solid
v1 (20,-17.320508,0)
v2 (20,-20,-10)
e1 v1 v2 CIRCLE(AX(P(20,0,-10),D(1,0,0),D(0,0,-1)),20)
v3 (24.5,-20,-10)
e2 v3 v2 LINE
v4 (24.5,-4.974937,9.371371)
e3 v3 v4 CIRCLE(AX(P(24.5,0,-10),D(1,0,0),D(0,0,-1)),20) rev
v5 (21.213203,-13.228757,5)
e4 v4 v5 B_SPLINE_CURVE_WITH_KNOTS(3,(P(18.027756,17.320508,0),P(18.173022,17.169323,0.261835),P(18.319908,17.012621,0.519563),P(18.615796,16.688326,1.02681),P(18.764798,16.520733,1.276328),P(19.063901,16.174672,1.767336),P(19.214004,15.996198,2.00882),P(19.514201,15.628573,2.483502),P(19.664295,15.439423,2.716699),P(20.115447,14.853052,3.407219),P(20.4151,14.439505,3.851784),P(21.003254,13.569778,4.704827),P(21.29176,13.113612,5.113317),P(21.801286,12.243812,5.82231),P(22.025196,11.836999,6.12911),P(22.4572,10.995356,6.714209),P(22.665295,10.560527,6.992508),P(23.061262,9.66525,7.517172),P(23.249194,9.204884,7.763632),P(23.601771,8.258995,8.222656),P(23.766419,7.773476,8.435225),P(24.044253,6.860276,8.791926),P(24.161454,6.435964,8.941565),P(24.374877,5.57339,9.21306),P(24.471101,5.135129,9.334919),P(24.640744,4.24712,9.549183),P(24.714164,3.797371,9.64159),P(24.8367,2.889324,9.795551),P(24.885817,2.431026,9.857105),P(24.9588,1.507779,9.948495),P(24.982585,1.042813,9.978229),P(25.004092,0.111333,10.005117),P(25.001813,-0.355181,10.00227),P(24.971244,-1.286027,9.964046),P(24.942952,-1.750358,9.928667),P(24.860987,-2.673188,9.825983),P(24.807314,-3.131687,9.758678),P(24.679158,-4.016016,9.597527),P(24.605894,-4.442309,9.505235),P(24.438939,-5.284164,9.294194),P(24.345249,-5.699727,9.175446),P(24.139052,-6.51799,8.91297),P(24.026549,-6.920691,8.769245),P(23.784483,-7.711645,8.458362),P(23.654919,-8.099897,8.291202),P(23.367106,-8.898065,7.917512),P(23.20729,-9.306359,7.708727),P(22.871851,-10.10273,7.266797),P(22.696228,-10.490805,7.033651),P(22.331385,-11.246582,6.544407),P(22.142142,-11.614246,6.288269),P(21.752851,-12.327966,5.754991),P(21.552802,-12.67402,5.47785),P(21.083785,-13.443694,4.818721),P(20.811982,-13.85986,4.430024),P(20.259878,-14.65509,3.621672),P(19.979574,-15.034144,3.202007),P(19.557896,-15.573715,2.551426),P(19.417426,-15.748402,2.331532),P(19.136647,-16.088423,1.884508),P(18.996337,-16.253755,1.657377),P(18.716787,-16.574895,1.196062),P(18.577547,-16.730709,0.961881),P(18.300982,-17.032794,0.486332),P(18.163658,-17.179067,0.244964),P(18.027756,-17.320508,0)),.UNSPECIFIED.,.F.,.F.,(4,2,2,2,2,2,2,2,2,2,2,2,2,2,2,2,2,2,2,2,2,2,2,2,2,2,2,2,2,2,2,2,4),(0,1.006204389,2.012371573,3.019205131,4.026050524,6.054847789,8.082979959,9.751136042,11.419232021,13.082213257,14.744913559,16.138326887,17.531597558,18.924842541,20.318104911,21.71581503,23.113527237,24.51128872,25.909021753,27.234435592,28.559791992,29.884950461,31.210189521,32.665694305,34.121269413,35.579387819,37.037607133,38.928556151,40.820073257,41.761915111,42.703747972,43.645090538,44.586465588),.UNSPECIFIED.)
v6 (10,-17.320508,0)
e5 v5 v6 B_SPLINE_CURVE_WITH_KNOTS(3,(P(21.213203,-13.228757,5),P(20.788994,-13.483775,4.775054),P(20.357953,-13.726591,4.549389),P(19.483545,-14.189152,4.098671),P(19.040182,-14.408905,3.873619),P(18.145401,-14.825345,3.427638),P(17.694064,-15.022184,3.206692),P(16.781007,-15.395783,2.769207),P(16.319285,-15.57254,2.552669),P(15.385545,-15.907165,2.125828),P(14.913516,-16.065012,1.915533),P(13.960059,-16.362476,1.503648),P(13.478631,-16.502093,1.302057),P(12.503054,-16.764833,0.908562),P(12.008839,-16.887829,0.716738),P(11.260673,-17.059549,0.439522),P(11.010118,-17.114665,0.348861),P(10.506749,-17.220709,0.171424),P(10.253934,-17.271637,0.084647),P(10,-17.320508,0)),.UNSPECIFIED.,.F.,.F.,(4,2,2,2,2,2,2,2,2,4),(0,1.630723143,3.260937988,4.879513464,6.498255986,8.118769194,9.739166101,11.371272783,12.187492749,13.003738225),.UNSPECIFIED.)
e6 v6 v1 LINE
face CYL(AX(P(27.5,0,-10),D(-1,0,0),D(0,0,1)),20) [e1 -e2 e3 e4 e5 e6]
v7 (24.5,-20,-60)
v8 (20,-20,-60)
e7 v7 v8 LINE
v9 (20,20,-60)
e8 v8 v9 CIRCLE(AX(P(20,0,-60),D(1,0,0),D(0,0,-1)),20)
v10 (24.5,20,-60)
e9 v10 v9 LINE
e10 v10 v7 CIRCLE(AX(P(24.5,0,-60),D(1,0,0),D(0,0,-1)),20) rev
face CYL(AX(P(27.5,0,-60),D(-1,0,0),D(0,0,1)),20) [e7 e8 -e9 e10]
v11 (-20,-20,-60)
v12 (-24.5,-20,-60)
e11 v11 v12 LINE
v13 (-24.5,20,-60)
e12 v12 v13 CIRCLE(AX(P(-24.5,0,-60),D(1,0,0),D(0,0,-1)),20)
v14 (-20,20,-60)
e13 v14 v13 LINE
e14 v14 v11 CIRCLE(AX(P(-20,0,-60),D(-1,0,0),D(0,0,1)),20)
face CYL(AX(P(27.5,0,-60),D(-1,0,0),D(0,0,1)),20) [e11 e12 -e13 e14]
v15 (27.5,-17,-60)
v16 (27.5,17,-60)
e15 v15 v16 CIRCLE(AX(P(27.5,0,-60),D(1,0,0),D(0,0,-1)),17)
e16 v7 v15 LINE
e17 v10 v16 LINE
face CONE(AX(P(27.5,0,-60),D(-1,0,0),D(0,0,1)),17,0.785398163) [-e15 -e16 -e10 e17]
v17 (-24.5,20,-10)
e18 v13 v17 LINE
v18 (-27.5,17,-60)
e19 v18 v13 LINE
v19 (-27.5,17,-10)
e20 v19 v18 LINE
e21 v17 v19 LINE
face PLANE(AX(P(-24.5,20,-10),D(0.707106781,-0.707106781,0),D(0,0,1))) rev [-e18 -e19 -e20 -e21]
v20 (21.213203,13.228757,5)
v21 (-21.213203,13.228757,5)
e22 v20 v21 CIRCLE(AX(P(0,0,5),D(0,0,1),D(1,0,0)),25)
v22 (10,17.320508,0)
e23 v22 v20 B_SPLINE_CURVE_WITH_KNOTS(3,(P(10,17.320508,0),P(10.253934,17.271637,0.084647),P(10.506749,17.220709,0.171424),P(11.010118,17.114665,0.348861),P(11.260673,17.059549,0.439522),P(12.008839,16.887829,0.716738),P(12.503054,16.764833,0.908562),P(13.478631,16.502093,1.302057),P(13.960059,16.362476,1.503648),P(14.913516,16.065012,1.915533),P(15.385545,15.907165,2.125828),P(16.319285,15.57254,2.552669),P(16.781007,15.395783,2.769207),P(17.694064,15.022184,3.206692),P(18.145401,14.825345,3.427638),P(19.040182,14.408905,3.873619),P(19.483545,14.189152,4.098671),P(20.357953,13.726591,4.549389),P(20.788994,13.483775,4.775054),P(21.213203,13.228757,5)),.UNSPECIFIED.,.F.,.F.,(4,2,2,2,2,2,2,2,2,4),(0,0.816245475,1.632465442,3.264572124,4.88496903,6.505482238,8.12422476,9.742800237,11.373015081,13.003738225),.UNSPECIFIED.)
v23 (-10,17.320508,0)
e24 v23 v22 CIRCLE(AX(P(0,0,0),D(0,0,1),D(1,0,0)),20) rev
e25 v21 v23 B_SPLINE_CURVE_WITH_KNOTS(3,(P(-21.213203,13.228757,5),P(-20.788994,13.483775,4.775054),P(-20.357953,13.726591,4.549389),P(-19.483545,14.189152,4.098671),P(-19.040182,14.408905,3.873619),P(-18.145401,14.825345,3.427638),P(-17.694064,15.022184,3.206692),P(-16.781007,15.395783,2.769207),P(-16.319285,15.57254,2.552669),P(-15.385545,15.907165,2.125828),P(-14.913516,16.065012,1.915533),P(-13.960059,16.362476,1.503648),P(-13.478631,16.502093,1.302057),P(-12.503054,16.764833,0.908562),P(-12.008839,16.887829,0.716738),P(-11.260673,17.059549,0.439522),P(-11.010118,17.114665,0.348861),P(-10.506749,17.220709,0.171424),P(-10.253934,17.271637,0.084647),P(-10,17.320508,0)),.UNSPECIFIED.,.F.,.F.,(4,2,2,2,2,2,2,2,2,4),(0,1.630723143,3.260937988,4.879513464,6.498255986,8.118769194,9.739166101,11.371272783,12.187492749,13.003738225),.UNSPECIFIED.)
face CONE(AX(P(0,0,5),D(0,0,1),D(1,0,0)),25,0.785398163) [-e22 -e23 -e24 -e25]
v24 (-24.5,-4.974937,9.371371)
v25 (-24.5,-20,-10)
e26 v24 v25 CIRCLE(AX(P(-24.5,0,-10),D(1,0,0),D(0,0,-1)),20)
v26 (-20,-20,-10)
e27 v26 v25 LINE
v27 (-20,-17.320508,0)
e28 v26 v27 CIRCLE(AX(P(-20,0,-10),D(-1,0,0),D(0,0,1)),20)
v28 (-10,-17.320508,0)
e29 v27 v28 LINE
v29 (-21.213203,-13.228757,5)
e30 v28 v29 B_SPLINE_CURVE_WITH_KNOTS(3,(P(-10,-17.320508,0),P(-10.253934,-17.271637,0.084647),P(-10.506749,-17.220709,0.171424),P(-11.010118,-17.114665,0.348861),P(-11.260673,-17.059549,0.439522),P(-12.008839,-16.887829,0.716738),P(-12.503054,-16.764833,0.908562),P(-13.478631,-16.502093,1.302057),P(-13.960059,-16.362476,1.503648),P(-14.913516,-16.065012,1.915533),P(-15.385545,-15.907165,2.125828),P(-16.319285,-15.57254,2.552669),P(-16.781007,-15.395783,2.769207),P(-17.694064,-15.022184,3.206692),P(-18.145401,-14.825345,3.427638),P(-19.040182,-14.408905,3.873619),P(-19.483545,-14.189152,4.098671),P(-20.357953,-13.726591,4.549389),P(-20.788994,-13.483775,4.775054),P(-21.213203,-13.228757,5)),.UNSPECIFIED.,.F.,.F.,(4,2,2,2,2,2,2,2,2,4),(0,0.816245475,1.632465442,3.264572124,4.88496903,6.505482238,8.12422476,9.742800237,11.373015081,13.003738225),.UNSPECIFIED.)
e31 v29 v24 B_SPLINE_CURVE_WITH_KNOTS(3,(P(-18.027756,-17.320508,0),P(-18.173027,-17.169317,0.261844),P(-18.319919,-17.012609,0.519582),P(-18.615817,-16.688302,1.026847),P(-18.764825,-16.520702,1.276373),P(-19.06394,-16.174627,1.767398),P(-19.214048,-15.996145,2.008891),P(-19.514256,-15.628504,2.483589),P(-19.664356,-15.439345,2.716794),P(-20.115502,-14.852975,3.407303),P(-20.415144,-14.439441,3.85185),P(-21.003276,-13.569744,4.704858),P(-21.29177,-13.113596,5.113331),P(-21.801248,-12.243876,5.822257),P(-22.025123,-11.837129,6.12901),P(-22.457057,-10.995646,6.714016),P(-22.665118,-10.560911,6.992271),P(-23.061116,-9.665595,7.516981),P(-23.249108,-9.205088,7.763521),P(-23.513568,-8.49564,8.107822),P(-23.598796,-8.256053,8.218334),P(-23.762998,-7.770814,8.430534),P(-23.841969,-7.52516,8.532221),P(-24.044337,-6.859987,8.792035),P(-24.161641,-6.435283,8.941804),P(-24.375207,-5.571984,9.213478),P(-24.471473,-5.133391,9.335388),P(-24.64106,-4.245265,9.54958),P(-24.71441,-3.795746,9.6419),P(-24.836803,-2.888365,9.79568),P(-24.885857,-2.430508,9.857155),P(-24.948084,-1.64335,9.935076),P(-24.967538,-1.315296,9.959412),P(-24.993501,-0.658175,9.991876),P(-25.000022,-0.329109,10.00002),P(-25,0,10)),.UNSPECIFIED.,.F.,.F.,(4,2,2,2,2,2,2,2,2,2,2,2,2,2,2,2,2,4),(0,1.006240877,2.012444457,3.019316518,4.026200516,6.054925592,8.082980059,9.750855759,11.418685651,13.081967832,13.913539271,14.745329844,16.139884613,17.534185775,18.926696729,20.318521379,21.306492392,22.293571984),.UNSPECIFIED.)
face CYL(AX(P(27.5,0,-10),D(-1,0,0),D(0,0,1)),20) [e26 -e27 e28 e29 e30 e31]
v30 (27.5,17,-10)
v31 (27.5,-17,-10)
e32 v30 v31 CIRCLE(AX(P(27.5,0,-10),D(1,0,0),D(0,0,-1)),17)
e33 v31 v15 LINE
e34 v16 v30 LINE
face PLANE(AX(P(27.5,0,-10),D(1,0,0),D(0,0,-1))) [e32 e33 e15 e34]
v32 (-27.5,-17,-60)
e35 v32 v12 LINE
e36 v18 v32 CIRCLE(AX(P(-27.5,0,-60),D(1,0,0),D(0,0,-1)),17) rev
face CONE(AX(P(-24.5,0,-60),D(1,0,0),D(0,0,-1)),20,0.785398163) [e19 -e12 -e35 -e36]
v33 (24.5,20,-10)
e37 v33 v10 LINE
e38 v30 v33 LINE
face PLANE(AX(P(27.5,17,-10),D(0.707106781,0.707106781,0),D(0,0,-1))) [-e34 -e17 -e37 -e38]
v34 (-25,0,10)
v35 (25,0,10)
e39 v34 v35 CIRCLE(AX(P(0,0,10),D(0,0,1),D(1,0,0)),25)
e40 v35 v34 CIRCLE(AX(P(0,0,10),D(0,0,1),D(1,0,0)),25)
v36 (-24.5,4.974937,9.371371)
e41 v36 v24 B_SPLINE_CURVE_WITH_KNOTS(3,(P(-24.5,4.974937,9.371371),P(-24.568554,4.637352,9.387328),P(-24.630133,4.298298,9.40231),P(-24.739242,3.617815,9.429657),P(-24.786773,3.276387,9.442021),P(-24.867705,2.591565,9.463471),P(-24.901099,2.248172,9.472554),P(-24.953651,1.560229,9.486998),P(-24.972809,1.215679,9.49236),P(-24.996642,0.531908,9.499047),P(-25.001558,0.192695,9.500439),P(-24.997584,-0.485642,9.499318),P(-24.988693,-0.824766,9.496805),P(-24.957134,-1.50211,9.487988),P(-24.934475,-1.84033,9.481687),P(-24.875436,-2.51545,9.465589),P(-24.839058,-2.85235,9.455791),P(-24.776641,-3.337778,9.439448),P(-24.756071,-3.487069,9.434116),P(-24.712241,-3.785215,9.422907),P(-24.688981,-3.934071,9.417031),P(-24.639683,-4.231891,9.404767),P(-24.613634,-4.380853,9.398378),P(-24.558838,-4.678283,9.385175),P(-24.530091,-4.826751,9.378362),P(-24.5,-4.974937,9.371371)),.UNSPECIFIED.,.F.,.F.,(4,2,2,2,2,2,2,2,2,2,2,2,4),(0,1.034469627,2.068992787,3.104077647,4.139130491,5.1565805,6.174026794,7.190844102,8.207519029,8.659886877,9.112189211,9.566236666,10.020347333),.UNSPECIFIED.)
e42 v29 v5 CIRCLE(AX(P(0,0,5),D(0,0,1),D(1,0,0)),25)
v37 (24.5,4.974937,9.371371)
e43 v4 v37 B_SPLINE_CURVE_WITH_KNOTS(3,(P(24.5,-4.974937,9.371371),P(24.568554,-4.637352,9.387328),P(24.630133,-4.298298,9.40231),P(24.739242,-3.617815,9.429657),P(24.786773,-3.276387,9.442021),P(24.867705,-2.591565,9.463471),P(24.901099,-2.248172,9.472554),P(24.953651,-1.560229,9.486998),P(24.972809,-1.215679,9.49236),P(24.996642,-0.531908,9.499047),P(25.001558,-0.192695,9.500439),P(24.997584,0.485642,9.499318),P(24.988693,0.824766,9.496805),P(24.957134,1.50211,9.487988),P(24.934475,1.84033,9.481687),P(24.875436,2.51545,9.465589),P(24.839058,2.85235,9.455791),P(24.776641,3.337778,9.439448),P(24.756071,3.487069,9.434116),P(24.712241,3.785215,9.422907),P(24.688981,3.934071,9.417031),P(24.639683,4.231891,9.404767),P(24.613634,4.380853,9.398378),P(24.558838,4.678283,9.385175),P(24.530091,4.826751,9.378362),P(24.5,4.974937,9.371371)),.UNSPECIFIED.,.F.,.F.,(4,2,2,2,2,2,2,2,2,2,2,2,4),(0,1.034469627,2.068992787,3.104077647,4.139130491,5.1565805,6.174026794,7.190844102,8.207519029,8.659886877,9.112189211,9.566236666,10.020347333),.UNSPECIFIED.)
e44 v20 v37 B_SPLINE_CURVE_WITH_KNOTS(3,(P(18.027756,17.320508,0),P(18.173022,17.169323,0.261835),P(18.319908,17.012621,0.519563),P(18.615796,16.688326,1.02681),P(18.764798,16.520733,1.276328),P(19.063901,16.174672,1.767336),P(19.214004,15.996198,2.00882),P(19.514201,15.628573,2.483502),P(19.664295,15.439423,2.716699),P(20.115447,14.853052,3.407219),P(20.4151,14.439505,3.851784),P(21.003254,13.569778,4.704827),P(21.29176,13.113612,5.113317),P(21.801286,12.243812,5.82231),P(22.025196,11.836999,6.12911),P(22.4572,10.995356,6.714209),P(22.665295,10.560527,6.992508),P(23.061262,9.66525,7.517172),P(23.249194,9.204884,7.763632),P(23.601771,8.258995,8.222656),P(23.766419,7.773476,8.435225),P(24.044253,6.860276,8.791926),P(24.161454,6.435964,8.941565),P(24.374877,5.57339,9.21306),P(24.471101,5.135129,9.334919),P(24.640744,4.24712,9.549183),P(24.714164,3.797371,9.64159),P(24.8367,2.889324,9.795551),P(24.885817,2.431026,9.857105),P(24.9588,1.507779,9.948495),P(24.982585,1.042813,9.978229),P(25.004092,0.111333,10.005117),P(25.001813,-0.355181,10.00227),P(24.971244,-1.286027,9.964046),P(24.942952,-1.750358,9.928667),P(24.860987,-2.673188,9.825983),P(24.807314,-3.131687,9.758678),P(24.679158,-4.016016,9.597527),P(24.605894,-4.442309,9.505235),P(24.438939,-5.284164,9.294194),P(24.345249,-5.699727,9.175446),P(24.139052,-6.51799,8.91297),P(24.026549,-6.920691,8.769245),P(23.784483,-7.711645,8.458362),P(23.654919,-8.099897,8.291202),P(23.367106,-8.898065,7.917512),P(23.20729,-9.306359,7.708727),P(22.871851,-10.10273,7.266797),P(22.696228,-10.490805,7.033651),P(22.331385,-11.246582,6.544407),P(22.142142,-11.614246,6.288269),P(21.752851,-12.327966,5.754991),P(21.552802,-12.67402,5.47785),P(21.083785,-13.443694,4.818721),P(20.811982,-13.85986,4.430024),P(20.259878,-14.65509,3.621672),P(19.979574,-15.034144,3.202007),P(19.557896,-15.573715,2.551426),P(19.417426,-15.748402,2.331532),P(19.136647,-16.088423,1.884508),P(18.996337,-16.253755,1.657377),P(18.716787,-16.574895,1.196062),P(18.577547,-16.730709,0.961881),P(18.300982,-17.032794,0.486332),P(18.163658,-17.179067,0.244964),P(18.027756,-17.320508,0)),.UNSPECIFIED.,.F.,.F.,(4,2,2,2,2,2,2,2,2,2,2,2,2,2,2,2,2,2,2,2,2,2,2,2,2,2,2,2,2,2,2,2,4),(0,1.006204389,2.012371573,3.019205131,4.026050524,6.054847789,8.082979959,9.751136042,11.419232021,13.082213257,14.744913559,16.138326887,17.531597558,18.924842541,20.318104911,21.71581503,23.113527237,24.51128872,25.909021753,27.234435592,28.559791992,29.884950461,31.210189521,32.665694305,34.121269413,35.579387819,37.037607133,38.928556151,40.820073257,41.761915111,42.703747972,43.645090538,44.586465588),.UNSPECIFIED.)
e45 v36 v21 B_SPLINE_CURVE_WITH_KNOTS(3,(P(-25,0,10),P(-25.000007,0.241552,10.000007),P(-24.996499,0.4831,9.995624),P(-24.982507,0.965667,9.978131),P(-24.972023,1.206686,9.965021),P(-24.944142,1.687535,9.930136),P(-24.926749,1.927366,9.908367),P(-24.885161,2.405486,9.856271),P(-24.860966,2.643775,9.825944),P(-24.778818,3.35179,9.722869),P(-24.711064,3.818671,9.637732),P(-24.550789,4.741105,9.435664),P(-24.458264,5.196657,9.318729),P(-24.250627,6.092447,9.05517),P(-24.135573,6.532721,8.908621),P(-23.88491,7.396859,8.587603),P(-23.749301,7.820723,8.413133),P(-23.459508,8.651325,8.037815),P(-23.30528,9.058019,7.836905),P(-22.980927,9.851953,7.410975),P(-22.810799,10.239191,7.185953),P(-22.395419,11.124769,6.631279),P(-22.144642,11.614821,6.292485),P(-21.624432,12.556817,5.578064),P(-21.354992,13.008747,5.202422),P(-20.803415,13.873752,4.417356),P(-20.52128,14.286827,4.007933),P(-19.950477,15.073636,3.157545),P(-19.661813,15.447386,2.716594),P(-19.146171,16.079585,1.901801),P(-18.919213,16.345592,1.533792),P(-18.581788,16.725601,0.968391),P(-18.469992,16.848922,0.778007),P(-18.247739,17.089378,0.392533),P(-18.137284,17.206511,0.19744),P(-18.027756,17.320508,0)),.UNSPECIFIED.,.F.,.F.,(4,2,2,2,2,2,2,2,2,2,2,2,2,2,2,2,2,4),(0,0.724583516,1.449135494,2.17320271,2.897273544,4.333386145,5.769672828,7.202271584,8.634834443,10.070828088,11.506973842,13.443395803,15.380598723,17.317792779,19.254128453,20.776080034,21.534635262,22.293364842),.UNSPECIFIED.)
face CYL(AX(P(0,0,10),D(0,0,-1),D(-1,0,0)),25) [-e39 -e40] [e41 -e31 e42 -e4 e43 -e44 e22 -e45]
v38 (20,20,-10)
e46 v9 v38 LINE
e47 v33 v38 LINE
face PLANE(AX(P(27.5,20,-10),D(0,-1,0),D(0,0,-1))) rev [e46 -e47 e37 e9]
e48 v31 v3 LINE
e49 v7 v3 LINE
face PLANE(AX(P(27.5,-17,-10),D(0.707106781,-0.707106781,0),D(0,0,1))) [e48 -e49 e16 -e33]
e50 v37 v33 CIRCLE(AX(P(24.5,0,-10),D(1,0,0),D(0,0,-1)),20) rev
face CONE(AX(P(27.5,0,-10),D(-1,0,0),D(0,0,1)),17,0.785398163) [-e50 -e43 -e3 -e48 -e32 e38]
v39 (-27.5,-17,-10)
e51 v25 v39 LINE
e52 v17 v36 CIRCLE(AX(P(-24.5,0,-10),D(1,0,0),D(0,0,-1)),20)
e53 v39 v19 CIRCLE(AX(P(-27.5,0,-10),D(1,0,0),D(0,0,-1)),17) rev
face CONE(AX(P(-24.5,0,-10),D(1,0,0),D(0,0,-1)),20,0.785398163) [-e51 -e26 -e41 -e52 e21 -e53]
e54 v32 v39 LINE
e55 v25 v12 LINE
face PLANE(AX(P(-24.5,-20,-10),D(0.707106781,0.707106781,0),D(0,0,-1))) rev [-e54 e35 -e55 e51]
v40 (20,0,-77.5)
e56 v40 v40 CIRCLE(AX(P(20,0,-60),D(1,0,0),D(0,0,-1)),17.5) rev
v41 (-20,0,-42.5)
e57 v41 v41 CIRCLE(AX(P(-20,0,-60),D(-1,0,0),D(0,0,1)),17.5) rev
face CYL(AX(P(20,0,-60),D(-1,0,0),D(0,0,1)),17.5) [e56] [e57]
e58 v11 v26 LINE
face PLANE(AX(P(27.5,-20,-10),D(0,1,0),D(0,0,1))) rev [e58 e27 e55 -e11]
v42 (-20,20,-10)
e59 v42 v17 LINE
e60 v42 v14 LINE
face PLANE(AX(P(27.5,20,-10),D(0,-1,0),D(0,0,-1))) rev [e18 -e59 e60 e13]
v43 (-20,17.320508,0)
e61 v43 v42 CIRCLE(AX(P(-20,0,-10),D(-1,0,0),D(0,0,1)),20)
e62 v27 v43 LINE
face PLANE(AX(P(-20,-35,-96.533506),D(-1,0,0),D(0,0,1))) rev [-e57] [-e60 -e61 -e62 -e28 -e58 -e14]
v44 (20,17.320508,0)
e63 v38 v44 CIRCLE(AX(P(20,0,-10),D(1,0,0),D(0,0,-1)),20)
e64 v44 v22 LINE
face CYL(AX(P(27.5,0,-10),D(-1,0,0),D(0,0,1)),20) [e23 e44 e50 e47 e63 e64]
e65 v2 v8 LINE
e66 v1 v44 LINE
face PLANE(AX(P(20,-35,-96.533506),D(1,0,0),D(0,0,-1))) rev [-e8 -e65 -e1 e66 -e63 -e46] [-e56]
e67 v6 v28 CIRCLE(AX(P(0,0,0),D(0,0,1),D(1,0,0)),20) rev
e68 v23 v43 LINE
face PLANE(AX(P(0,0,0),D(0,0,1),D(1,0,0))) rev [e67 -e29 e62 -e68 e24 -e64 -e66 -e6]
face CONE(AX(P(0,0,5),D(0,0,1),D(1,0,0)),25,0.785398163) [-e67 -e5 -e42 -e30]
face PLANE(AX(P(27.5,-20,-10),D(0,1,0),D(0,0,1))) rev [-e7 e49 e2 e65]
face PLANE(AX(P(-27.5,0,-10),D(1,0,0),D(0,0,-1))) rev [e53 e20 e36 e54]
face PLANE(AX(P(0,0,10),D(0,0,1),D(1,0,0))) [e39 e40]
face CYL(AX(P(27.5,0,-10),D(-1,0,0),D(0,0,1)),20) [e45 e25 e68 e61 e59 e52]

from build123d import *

# Parameters (mm, degrees)
SKETCH1_R           = 25
BOSS_EXTRUDE1_DEPTH = 10
BOSS_EXTRUDE3_DEPTH = 27.5
SKETCH7_W           = 40
SKETCH7_H           = 96.533506044
CUT_EXTRUDE3_DEPTH  = 55
CHAMFER1_SIZE       = 3
SKETCH8_R           = 17.5
BOSS_EXTRUDE4_DEPTH = 40
CHAMFER2_SIZE       = 5


with BuildPart() as part:
    # Sketch1 → Boss-Extrude1 (new body)
    with BuildSketch(Plane.XY):
        Circle(SKETCH1_R)
    extrude(amount=BOSS_EXTRUDE1_DEPTH)

    # Sketch6 → Boss-Extrude3 (add, symmetric)
    with BuildSketch(Plane(origin=(0, 0, 0), x_dir=(0, 0, -1), z_dir=(1, 0, 0))):
        with BuildLine():
            Line((10, 20), (60, 20))
            ThreePointArc((60, 20), (80, 0), (60, -20))
            Line((60, -20), (10, -20))
            ThreePointArc((10, -20), (-10, 0), (10, 20))
        make_face()
    extrude(amount=BOSS_EXTRUDE3_DEPTH, both=True)

    # Sketch7 → Cut-Extrude3 (cut)
    with BuildSketch(Plane(origin=(0, 20, 0), x_dir=(1, 0, 0), z_dir=(0, 1, 0))):
        with Locations((0, 48.266753022)):
            Rectangle(SKETCH7_W, SKETCH7_H)
    extrude(amount=-CUT_EXTRUDE3_DEPTH, mode=Mode.SUBTRACT)

    # Chamfer1
    # the kernel refuses this chamfer: 3 mm, written as the material it takes off along each edge
    with BuildSketch(Plane(origin=(-27.5, -20, -60), x_dir=(0.9996219169112965, -0.02749587661058676, 0), z_dir=(0, 0, 1)), Plane(origin=(27.5, -20, -60), x_dir=(0.027495876610586768, 0.9996219169112968, 0), z_dir=(0, 0, 1)), Plane(origin=(27.5, 20, -10), x_dir=(0.027495876610586768, -0.9996219169112968, 0), z_dir=(0, 0, -1))) as chamfer1_piece_1:
        Polygon((CHAMFER1_SIZE * 0.999621916911, CHAMFER1_SIZE * 0.0274958766106), (-CHAMFER1_SIZE * 0.0274958766106, CHAMFER1_SIZE * 0.999621916911), (0, 0), align=None)
    extrude(amount=50, mode=Mode.SUBTRACT)
    with BuildSketch(Plane(origin=(-27.5, 0, -60), x_dir=(0, 1, 0), z_dir=(0, 0, 1))) as chamfer1_piece_2:
        Polygon((20 - CHAMFER1_SIZE, 0), (20, -CHAMFER1_SIZE), (20, 0), align=None)
    revolve(axis=Axis((-27.5, 0, -60), (-1, 0, 0)), revolution_arc=180, mode=Mode.SUBTRACT)
    with BuildSketch(Plane(origin=(-27.5, 0, -10), x_dir=(0, -1, 0), z_dir=(0, 0, -1))) as chamfer1_piece_3_section:
        Polygon((20 - CHAMFER1_SIZE, 0), (20, -CHAMFER1_SIZE), (20, 0), align=None)
    chamfer1_piece_3 = revolve(axis=Axis((-27.5, 0, -10), (-1, 0, 0)), revolution_arc=180, mode=Mode.PRIVATE)
    chamfer1_piece_3 = chamfer1_piece_3 - Plane(origin=(0, 0, 8.545585815), x_dir=(1, 0, 0), z_dir=(0, 0, -1)) * Cylinder(25, 81, mode=Mode.PRIVATE)
    add(chamfer1_piece_3, mode=Mode.SUBTRACT)
    with BuildSketch(Plane(origin=(-27.5, 20, -10), x_dir=(-0.027495876610586768, -0.9996219169112968, 0), z_dir=(0, 0, -1))) as chamfer1_piece_4:
        Polygon((CHAMFER1_SIZE * 0.999621916911, -CHAMFER1_SIZE * 0.0274958766106), (-CHAMFER1_SIZE * 0.0274958766106, -CHAMFER1_SIZE * 0.999621916911), (0, 0), align=None)
    extrude(amount=50, mode=Mode.SUBTRACT)
    with BuildSketch(Plane(origin=(27.5, 0, -60), x_dir=(0, 1, 0), z_dir=(0, 0, 1))) as chamfer1_piece_5:
        Polygon((20, CHAMFER1_SIZE), (20 - CHAMFER1_SIZE, 0), (20, 0), align=None)
    revolve(axis=Axis((27.5, 0, -60), (-1, 0, 0)), revolution_arc=180, mode=Mode.SUBTRACT)
    with BuildSketch(Plane(origin=(27.5, 0, -10), x_dir=(0, -1, 0), z_dir=(0, 0, -1))) as chamfer1_piece_6_section:
        Polygon((20 - CHAMFER1_SIZE, 0), (20, CHAMFER1_SIZE), (20, 0), align=None)
    chamfer1_piece_6 = revolve(axis=Axis((27.5, 0, -10), (-1, 0, 0)), revolution_arc=180, mode=Mode.PRIVATE)
    chamfer1_piece_6 = chamfer1_piece_6 - Plane(origin=(0, 0, 8.545585813), x_dir=(1, 0, 0), z_dir=(0, 0, -1)) * Cylinder(25, 81, mode=Mode.PRIVATE)
    add(chamfer1_piece_6, mode=Mode.SUBTRACT)

    # Sketch8 → Boss-Extrude4 (add)
    with BuildSketch(Plane(origin=(-20, 0, 0), x_dir=(0, 0, -1), z_dir=(1, 0, 0))):
        with Locations(Location((60, 0, 0), (0, 0, 180))):
            Circle(SKETCH8_R)
    extrude(amount=BOSS_EXTRUDE4_DEPTH)

    # Chamfer2
    chamfer2_edges = [part.edges().sort_by_distance(p)[0] for p in [
        (0, 25, 0),
        (0, -25, 0),
    ]]
    chamfer(chamfer2_edges, length=CHAMFER2_SIZE)


solid = part.part
